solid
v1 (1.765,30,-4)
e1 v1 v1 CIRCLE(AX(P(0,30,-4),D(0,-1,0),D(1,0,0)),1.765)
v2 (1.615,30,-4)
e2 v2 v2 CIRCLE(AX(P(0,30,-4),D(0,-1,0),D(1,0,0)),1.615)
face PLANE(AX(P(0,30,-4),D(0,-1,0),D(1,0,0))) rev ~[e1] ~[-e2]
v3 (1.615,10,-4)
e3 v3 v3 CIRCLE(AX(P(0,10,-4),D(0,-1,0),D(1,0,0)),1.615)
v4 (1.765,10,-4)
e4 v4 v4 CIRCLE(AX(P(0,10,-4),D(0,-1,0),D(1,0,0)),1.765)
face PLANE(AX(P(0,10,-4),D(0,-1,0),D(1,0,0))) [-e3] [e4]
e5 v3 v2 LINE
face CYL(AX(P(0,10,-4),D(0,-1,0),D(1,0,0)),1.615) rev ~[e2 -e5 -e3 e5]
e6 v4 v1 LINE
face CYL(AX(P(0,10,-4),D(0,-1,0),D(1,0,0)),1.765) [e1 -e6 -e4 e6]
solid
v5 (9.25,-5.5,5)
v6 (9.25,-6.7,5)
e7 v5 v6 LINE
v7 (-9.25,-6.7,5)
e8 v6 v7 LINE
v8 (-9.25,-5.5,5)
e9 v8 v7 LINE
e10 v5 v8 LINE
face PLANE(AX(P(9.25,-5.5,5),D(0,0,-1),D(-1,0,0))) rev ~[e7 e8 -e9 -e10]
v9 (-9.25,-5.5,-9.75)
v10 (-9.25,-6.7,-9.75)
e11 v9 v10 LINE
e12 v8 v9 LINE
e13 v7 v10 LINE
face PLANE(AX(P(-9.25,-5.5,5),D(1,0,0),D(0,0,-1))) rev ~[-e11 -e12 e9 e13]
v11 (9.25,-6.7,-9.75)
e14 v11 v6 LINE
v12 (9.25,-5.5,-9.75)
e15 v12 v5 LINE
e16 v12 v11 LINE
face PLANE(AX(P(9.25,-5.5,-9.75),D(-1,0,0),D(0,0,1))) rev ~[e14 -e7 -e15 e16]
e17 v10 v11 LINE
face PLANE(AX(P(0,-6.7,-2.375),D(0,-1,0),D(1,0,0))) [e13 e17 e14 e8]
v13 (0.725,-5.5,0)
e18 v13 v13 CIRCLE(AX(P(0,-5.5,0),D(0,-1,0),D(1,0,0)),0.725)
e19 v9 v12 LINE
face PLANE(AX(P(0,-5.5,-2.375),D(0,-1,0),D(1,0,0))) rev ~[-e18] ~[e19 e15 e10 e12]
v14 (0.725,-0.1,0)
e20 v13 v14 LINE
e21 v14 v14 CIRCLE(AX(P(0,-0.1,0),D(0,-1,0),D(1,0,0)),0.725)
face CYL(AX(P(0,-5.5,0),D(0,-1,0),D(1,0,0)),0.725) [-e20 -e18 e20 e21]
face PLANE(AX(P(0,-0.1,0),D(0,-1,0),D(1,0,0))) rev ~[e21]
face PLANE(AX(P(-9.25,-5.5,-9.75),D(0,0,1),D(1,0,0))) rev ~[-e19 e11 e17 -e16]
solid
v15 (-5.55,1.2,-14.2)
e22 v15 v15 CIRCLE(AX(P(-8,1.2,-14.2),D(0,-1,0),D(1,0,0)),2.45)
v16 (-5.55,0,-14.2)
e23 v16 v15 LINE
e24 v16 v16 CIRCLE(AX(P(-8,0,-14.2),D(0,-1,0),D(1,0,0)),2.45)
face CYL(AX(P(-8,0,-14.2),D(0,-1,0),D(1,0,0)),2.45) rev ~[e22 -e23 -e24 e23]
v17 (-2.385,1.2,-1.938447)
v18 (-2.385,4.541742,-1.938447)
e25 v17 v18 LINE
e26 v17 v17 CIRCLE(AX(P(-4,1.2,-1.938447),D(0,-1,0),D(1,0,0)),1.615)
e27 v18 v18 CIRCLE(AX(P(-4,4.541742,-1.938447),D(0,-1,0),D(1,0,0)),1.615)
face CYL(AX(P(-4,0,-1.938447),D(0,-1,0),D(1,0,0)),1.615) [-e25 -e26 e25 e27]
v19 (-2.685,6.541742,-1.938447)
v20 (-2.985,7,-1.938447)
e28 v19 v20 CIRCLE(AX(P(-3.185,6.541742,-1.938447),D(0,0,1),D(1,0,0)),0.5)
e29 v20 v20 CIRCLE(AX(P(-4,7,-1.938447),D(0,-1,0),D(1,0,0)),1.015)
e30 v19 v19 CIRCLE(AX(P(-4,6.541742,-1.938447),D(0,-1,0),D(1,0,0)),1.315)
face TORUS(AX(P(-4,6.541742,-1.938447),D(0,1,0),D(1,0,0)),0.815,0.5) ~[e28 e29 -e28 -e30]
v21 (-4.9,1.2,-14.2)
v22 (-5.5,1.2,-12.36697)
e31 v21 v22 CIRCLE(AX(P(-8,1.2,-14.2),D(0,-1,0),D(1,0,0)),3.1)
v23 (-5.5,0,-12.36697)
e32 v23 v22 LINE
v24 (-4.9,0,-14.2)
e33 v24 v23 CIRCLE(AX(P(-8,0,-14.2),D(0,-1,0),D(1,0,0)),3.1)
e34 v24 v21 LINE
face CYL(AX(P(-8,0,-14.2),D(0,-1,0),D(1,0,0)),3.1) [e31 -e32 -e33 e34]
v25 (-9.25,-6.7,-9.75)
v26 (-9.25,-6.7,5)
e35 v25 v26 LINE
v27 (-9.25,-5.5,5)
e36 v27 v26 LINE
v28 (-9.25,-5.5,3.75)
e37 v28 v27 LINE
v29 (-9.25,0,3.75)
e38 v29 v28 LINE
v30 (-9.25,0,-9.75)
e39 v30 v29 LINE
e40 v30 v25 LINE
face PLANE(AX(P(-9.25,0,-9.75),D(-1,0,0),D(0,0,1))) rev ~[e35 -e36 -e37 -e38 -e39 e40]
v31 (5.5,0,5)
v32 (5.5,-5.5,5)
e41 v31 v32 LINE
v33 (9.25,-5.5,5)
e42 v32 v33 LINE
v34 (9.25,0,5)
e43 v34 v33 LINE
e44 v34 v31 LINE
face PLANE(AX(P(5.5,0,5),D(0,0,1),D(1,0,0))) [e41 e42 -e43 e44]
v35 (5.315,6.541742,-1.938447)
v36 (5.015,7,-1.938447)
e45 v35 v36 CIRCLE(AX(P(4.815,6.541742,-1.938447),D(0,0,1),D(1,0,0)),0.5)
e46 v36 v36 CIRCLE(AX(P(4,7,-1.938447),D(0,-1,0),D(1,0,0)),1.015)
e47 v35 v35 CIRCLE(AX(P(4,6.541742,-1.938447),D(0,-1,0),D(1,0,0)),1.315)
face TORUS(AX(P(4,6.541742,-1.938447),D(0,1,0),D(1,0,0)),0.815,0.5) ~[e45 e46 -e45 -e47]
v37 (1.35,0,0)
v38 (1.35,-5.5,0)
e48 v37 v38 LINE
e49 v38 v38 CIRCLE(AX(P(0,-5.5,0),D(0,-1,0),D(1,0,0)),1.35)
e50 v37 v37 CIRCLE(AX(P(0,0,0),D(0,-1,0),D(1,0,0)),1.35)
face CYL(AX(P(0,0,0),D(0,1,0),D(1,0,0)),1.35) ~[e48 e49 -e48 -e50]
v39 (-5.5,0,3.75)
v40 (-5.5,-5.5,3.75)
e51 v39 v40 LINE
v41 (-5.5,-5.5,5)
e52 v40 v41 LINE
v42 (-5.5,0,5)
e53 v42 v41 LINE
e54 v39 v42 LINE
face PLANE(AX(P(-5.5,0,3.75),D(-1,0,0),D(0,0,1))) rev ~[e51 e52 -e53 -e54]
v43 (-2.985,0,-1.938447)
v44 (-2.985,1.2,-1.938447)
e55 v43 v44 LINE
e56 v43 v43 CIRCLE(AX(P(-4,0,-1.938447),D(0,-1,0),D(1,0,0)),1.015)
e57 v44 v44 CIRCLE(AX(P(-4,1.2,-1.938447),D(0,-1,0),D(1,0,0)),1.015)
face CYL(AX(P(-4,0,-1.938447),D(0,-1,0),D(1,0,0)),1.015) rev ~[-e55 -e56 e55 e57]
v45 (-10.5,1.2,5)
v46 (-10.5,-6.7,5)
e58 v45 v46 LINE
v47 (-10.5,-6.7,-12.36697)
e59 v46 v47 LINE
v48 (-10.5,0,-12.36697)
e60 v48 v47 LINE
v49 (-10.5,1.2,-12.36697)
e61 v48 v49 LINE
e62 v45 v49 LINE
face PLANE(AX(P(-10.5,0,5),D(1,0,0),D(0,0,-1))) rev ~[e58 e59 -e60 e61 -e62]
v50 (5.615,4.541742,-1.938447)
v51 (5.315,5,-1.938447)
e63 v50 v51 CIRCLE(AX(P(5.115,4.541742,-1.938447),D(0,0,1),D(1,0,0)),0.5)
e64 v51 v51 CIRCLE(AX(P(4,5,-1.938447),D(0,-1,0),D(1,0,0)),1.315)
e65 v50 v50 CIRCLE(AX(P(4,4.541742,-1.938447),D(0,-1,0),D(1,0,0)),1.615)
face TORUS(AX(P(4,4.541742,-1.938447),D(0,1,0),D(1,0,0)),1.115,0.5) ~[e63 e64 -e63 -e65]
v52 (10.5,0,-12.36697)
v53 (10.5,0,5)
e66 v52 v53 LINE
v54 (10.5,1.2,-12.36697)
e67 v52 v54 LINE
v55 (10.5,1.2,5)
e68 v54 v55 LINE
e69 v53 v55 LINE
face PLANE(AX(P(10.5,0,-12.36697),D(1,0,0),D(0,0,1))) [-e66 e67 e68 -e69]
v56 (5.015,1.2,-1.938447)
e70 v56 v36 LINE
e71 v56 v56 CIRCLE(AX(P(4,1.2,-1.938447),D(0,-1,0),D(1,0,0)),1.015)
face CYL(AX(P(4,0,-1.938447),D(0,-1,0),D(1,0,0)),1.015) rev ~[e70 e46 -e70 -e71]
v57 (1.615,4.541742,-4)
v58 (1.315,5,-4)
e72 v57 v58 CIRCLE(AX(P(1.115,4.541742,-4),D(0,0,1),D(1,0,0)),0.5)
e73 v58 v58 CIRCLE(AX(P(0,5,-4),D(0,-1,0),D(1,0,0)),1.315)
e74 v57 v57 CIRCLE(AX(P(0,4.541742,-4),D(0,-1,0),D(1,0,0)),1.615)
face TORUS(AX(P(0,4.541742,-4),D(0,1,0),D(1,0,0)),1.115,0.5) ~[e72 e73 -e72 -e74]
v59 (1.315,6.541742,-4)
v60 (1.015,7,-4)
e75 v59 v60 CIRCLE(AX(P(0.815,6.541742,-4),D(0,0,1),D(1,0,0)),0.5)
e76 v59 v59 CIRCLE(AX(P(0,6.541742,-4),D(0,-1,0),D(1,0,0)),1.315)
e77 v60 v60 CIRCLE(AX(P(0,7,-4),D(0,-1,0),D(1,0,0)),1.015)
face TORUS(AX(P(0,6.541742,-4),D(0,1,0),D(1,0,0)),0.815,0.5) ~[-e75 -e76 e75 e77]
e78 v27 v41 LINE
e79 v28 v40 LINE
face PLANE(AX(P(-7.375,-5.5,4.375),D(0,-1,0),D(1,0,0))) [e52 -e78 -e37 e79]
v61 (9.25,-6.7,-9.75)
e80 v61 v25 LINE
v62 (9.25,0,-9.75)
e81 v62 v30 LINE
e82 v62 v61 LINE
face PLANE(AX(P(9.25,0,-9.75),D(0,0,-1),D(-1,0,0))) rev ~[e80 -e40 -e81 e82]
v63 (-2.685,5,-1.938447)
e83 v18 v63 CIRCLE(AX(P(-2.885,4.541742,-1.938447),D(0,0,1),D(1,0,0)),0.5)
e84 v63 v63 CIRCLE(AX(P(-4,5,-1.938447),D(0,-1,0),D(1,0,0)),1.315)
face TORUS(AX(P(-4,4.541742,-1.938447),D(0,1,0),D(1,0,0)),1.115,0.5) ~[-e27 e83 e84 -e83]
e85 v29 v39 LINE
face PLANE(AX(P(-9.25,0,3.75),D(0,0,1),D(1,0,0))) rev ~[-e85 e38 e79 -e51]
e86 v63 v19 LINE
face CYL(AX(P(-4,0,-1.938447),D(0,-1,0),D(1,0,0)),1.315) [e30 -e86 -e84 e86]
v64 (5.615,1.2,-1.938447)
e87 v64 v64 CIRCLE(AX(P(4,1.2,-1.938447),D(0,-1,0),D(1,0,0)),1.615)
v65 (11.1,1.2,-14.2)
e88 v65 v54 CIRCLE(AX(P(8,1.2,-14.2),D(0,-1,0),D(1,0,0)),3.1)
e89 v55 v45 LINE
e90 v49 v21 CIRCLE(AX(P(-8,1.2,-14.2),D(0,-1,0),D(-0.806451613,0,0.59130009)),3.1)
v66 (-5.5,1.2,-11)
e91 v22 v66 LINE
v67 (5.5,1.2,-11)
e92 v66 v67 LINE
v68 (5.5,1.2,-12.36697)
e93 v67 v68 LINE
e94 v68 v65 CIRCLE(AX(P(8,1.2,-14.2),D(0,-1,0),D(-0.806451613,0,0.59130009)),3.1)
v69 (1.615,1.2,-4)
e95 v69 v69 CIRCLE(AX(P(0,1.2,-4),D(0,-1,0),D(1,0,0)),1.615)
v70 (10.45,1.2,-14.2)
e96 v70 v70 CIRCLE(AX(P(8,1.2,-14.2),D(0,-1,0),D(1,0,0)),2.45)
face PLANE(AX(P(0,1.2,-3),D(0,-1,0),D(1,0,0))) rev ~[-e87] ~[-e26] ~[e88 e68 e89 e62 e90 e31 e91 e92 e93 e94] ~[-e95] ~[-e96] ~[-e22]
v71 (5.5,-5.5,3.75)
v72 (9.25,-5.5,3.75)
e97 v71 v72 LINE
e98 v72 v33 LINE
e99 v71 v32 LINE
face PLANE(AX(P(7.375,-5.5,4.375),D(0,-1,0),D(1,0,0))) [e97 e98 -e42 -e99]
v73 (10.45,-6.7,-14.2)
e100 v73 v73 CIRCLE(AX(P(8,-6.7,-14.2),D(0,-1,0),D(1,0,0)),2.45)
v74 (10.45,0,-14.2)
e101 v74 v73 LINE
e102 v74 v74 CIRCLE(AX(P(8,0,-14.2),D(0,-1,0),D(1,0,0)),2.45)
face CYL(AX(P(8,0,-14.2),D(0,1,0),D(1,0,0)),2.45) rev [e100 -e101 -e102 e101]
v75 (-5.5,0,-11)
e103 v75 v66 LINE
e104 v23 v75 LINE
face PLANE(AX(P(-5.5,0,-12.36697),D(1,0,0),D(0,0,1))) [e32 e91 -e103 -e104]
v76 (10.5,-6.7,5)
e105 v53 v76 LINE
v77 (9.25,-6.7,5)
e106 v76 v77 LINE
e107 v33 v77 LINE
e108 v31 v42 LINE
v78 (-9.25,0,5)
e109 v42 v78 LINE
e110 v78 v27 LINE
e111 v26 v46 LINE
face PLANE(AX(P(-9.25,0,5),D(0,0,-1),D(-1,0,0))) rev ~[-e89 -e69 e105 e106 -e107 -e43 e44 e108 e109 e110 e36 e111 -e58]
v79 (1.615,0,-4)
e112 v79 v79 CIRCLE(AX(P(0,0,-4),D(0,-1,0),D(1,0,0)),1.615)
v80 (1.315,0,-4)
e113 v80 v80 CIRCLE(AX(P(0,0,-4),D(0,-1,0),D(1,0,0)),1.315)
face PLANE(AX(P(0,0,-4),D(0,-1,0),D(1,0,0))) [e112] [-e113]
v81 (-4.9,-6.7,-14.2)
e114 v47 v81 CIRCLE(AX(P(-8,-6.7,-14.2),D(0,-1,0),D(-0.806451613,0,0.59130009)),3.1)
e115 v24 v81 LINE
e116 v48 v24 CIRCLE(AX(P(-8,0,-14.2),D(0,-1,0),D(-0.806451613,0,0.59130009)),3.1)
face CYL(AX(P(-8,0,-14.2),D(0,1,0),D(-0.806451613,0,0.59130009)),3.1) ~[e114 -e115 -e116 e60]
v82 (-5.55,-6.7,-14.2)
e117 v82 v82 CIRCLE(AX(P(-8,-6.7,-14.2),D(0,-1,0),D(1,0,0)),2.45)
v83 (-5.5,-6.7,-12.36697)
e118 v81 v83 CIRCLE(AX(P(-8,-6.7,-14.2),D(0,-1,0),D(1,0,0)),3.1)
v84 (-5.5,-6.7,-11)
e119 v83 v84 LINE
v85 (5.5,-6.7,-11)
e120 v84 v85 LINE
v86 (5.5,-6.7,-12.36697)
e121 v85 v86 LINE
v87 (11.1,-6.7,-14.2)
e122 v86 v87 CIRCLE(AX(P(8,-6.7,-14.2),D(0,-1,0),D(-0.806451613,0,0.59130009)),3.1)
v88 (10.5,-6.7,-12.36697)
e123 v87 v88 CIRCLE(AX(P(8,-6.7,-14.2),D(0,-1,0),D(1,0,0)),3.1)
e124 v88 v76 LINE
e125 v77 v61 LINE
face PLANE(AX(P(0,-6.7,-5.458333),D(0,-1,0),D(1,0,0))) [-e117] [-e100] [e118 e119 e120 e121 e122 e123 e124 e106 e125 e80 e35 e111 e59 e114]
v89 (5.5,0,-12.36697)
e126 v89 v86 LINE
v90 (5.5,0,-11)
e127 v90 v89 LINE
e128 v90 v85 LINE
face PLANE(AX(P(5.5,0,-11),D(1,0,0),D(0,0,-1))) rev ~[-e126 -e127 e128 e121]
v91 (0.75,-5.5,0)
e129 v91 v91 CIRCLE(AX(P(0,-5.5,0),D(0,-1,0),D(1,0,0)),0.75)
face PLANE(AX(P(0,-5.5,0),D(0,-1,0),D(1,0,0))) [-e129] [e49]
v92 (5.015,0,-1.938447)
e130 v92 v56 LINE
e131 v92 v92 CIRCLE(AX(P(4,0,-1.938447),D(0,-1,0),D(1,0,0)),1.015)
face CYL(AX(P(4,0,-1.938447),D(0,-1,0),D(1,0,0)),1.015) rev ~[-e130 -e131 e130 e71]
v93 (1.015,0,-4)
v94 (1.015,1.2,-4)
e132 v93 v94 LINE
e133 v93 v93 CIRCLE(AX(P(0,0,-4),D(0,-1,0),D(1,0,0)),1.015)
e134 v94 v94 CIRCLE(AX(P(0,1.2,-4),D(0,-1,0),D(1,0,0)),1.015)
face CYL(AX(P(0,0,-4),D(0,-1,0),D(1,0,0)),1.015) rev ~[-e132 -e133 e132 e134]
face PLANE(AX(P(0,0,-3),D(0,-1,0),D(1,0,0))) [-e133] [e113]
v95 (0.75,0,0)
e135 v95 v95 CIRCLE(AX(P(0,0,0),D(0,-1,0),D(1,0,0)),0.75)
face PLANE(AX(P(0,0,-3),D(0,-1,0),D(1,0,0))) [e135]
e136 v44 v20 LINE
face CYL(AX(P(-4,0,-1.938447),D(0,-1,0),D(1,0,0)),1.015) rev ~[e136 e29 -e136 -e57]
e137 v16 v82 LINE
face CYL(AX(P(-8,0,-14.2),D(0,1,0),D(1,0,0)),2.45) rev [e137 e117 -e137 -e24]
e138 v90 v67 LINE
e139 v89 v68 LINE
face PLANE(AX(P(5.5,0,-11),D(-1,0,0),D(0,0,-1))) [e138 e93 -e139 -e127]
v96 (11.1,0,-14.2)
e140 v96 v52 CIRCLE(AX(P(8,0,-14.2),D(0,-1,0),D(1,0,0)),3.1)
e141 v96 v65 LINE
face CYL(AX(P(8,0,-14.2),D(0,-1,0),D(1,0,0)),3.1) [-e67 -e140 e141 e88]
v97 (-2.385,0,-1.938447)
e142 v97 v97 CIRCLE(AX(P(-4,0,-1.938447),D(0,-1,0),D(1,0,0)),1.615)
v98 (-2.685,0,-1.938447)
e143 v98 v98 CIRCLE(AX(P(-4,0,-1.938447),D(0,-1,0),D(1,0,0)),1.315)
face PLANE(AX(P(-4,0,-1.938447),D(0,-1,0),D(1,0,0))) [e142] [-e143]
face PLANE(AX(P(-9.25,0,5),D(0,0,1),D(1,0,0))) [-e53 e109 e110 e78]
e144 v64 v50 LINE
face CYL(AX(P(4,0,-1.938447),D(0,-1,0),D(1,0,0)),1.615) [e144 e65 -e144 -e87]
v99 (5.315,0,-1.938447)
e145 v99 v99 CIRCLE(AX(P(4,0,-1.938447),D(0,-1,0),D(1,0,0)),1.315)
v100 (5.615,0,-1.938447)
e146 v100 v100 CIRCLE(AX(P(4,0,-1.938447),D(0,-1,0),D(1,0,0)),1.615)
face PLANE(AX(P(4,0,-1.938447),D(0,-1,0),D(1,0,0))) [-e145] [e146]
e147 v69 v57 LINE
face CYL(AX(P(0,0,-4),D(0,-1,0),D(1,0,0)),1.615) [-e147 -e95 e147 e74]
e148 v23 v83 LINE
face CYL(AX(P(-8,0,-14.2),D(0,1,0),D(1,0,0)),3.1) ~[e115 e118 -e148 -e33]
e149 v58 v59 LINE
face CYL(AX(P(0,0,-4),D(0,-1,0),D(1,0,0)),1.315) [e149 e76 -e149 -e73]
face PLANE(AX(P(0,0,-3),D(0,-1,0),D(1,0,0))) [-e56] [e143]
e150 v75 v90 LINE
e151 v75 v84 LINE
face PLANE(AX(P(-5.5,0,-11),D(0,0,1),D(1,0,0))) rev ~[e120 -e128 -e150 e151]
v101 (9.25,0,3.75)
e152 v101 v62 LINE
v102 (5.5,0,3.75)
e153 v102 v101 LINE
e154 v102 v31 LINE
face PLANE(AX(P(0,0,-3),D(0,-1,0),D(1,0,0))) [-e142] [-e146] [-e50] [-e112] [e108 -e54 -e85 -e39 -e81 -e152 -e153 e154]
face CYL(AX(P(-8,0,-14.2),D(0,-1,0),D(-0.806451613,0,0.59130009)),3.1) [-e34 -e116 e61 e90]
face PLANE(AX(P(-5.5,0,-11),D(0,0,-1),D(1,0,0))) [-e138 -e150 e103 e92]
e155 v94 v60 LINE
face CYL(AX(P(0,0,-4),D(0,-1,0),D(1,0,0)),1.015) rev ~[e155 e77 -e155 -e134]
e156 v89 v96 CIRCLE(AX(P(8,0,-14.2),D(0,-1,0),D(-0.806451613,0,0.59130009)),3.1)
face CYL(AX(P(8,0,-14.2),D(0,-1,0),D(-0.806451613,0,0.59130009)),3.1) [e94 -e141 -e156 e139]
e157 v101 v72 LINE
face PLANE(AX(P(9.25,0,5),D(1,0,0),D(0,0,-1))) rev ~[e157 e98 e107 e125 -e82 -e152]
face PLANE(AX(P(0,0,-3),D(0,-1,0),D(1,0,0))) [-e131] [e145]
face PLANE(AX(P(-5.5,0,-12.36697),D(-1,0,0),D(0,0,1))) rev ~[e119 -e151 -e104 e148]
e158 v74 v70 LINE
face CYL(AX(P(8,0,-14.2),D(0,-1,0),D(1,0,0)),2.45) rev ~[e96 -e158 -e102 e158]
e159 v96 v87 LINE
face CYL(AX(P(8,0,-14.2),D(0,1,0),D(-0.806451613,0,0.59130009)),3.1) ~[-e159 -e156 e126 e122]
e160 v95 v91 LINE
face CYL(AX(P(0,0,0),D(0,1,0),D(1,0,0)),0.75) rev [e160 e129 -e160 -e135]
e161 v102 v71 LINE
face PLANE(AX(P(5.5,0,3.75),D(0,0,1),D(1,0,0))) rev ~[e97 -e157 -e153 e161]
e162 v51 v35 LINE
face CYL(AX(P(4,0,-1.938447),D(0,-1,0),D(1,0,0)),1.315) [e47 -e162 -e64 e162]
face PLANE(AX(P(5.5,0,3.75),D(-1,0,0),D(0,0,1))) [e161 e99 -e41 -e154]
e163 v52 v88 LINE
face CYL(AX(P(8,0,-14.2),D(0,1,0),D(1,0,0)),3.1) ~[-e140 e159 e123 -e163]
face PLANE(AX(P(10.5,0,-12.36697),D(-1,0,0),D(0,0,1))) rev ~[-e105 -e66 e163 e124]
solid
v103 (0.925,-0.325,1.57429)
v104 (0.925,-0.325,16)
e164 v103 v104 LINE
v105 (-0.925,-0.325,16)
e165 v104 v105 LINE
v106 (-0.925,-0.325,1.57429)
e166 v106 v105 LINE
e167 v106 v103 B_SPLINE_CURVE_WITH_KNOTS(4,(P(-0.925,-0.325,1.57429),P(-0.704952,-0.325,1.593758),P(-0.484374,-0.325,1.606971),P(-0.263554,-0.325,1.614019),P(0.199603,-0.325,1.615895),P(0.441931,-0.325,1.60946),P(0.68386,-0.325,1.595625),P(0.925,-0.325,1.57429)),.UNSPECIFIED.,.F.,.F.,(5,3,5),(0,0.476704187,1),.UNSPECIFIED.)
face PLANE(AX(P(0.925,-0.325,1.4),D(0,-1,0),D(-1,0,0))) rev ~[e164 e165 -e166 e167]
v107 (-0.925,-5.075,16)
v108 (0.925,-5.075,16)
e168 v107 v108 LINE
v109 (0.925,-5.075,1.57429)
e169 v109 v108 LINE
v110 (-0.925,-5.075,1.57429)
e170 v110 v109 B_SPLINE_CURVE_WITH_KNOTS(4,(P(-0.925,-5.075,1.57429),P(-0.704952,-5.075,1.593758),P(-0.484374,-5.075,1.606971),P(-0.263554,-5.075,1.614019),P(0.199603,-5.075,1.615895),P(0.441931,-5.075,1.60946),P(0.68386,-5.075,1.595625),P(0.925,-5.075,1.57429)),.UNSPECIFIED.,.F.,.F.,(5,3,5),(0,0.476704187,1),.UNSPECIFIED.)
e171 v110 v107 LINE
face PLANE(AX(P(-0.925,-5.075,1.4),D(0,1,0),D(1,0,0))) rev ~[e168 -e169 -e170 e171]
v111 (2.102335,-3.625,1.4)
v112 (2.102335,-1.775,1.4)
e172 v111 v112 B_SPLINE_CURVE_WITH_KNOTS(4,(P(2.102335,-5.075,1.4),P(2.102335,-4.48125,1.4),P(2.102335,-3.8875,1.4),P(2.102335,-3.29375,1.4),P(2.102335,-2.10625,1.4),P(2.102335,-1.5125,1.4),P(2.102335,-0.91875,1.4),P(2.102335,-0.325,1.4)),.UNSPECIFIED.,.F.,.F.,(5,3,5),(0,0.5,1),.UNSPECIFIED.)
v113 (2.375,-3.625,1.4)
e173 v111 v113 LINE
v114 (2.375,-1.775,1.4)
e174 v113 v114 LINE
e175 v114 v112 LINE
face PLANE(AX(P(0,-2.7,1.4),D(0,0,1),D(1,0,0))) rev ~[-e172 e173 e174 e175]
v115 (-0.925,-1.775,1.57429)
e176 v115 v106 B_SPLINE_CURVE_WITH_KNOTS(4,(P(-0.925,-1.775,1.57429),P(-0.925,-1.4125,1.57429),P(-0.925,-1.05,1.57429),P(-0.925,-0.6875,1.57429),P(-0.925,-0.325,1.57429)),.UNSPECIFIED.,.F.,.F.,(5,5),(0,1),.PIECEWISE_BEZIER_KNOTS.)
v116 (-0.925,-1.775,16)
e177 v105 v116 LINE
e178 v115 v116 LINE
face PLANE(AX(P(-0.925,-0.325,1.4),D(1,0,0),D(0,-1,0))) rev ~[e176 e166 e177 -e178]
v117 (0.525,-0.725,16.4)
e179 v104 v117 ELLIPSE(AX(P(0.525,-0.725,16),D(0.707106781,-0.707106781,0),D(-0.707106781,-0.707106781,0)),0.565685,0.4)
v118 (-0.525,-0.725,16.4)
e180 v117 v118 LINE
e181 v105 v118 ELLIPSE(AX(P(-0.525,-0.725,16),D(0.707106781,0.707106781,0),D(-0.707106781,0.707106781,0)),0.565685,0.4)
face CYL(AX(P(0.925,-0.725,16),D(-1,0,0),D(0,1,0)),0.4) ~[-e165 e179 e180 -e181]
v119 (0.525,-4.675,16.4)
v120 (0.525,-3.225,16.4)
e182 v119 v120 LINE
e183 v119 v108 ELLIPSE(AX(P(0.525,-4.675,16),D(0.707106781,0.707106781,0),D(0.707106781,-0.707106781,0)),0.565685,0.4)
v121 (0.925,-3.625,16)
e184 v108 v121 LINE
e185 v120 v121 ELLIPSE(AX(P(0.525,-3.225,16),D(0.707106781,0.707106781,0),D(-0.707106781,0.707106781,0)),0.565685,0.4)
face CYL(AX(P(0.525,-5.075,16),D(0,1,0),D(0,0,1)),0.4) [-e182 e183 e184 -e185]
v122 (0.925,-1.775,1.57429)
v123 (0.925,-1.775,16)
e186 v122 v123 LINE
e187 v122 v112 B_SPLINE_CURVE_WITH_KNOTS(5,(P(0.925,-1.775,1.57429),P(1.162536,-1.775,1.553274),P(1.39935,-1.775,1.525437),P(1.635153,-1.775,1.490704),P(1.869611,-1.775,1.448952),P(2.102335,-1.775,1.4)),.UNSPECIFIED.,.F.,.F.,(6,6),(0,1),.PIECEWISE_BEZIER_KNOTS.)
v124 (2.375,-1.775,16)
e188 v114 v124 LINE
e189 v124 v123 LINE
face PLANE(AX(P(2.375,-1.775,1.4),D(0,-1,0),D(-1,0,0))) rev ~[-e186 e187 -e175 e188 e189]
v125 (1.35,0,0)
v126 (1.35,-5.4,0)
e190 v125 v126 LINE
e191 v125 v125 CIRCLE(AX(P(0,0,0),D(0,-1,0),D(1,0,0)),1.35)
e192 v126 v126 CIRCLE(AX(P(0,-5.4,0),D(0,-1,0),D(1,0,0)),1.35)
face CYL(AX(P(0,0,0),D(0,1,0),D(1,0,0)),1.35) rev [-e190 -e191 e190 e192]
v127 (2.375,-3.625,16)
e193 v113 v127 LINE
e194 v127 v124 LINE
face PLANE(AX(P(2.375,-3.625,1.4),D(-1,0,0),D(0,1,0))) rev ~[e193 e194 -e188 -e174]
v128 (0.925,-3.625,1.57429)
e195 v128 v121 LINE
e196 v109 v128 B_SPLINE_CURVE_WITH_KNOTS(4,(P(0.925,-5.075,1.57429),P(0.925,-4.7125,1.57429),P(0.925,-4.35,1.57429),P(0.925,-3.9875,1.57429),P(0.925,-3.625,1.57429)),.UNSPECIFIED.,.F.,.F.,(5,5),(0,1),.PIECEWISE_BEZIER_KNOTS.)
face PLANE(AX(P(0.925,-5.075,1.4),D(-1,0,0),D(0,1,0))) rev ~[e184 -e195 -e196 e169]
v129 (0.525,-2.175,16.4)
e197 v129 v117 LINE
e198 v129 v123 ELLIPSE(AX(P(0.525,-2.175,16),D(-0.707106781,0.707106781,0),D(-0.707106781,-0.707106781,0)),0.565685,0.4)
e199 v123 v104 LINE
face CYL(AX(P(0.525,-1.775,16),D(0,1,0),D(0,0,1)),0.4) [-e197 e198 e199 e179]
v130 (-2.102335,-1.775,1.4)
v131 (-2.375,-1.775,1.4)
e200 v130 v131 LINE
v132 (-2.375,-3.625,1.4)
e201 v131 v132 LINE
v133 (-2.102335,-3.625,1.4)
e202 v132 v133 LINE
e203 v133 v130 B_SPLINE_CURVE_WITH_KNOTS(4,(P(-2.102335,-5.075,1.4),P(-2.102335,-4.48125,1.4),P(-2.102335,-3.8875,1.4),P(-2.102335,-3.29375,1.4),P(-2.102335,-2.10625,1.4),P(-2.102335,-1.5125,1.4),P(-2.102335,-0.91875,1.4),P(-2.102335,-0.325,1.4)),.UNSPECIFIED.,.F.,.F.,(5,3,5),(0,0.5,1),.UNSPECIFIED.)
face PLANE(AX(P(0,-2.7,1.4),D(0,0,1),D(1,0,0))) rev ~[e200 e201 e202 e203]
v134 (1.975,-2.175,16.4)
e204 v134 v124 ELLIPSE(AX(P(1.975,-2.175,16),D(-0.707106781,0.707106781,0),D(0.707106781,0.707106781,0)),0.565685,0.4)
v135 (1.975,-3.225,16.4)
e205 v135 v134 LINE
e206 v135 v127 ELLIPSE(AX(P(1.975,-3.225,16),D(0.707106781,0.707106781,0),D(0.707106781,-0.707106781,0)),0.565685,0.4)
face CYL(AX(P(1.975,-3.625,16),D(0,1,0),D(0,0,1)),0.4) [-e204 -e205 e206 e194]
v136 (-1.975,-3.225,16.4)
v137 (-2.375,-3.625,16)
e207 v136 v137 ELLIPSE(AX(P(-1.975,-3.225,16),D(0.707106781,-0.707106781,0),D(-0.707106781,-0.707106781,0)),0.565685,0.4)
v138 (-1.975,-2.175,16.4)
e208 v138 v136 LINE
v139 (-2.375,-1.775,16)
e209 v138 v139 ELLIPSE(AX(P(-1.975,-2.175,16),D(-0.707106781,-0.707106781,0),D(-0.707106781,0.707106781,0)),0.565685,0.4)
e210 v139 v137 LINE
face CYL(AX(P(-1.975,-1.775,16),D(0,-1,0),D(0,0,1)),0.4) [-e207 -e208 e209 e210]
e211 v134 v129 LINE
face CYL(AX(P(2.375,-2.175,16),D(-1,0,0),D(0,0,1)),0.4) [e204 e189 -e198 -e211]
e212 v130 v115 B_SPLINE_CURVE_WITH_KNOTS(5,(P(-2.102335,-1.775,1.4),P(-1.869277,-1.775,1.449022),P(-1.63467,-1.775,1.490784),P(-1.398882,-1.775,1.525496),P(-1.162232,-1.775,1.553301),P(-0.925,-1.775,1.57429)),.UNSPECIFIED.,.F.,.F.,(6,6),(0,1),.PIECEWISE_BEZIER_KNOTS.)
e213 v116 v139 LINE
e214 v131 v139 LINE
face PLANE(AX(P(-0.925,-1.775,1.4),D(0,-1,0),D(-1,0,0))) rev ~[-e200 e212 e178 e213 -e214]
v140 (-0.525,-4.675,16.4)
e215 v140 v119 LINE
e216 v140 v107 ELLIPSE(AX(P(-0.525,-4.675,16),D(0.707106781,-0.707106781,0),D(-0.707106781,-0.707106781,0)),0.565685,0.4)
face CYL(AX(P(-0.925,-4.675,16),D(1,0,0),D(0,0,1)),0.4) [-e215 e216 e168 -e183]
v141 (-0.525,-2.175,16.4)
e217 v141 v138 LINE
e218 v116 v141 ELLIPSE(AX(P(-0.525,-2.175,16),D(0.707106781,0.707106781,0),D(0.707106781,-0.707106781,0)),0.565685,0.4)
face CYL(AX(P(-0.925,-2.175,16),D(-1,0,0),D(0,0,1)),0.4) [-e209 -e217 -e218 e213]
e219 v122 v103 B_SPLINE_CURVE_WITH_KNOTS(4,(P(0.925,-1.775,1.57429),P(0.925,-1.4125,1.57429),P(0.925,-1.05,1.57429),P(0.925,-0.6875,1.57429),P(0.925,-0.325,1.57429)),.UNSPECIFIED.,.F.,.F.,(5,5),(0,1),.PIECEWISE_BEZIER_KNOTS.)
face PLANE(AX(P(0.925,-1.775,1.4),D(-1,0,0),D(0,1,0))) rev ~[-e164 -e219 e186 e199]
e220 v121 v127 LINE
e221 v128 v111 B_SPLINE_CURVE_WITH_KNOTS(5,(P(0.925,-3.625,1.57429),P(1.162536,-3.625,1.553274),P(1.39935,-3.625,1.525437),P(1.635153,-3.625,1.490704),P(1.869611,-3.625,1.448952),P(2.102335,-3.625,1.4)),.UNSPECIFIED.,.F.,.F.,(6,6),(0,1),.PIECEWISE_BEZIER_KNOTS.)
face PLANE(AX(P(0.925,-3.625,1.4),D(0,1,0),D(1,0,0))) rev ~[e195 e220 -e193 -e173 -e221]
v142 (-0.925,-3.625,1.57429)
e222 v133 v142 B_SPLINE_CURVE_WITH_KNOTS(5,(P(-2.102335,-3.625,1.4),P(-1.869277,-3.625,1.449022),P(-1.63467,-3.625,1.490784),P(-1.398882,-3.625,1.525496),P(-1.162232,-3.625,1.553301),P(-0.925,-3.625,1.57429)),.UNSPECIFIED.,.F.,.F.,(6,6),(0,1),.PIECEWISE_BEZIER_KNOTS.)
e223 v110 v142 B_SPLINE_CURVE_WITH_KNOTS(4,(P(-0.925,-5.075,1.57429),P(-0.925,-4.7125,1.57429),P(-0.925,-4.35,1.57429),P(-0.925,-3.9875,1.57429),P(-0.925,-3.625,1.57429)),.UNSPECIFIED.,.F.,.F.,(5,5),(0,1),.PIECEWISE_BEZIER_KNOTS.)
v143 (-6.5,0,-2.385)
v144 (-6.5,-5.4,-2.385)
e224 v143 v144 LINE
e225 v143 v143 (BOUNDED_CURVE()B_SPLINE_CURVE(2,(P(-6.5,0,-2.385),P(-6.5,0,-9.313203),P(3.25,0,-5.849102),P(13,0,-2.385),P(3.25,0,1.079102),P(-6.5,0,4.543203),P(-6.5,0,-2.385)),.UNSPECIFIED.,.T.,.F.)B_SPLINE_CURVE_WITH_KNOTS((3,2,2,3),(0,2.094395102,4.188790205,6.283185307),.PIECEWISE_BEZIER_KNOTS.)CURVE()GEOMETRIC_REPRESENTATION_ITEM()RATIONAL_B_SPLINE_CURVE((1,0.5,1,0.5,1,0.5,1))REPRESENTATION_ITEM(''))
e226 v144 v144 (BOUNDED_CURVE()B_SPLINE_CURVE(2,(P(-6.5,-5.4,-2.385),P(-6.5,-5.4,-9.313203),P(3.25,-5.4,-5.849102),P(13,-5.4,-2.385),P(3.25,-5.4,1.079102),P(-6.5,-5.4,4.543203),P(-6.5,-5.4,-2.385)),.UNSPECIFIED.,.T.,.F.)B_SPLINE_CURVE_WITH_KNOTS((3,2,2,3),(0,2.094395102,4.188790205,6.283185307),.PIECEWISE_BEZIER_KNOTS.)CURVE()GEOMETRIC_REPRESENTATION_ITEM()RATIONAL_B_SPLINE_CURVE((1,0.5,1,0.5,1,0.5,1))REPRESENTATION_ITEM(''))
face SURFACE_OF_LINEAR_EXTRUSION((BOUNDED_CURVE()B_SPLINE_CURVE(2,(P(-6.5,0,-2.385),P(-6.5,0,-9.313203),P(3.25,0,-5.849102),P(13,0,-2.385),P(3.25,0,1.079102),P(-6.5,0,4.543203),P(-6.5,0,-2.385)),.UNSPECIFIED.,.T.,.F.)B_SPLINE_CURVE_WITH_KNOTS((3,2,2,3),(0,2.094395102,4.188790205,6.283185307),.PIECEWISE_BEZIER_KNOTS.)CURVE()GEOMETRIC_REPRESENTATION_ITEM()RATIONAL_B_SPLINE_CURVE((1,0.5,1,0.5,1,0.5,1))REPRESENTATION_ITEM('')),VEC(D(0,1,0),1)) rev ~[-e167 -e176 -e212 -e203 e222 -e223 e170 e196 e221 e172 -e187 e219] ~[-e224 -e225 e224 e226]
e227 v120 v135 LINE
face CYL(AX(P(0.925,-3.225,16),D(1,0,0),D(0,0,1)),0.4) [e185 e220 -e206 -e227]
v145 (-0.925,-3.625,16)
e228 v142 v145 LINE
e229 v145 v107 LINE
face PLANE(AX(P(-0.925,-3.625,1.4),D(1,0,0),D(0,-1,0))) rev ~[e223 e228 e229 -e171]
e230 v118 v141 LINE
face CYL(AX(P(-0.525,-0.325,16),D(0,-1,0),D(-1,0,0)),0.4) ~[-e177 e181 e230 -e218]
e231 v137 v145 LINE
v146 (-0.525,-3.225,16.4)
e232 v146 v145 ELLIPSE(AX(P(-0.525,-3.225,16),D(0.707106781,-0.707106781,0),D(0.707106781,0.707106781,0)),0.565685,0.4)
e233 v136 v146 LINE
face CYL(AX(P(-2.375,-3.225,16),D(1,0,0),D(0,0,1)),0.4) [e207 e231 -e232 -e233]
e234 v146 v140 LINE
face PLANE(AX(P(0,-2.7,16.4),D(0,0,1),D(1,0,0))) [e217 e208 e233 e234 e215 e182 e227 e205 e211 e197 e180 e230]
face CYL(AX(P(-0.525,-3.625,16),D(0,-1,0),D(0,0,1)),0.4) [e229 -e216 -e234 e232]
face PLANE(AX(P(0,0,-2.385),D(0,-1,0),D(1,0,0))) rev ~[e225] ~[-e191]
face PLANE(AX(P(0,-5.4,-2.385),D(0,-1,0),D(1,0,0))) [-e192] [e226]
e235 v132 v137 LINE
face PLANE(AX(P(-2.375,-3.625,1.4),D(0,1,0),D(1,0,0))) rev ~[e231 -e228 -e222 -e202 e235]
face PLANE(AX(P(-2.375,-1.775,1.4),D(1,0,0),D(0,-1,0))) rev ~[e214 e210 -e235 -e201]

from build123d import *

# Parameters (mm, degrees)
F0_R      = 1.615
F0_R_2    = 1.35
F0_R_3    = 2.45
F0_R_4    = 1.315
F0_R_5    = 0.75
F0_R_6    = 1.015
F0_W      = 3.75
F0_H      = 1.25
F1_DEPTH  = 1.2
F2_DEPTH  = 6.7
F3_DEPTH  = 5.5
F4_DEPTH  = 5
F5_DEPTH  = 7
F8_R      = 0.725
F9_DEPTH  = 1.2
F10_DEPTH = 5.4
F11_DEPTH = 5.4
F14_DEPTH = 15
F15_R     = 0.4
F17_R     = 1.765
F17_R_2   = 1.615
F18_DEPTH = 20


# Not quite as in the source:
# - a fillet or chamfer that OpenCascade refuses, or shapes differently, is made with other operations: its cross-section is extruded or revolved along the edge and cut away or added


with BuildPart() as f1:
    # F0 (on Front) → F1 (new body)
    with BuildSketch(Plane.XZ):
        Polygon((0, 3.75), (-5.5, 3.75), (-9.25, 3.75), (-9.25, -9.75), (9.25, -9.75), (9.25, 3.75), (5.5, 3.75), align=None)
        with BuildLine():
            add(Edge.make_bspline(
                [(-6.5, -2.385), (-6.5, -9.3132032303), (3.25, -5.8491016151), (13, -2.385), (3.25, 1.0791016151), (-6.5, 4.5432032303), (-6.5, -2.385)],
                knots=[0, 0, 0, 2.0943951024, 2.0943951024, 4.1887902048, 4.1887902048, 6.2831853072, 6.2831853072, 6.2831853072], degree=2, weights=[1, 0.5, 1, 0.5, 1, 0.5, 1]))
        make_face(mode=Mode.SUBTRACT)
        with BuildLine():
            add(Edge.make_bspline(
                [(-6.5, -2.385), (-6.5, -9.3132032303), (3.25, -5.8491016151), (13, -2.385), (3.25, 1.0791016151), (-6.5, 4.5432032303), (-6.5, -2.385)],
                knots=[0, 0, 0, 2.0943951024, 2.0943951024, 4.1887902048, 4.1887902048, 6.2831853072, 6.2831853072, 6.2831853072], degree=2, weights=[1, 0.5, 1, 0.5, 1, 0.5, 1]))
        make_face()
        with Locations((-4, -1.9384471872)):
            Circle(F0_R, mode=Mode.SUBTRACT)
        with Locations((0, -4)):
            Circle(F0_R, mode=Mode.SUBTRACT)
        with Locations((4, -1.9384471872)):
            Circle(F0_R, mode=Mode.SUBTRACT)
        Circle(F0_R_2, mode=Mode.SUBTRACT)
        Polygon((-9.25, 3.75), (-9.25, 5), (-10.5, 5), (-10.5, -11), (-5.5, -11), (5.5, -11), (10.5, -11), (10.5, 5), (9.25, 5), (9.25, 3.75), (9.25, -9.75), (-9.25, -9.75), align=None)
        with BuildLine():
            ThreePointArc((-5.5, -12.366969722), (-8, -11.1), (-10.5, -12.366969722))
            ThreePointArc((-10.5, -12.366969722), (-8.9643650761, -17.1461839725), (-4.9, -14.2))
            ThreePointArc((-4.9, -14.2), (-5.0538160275, -13.2356349239), (-5.5, -12.366969722))
        make_face()
        with Locations((-8, -14.2)):
            Circle(F0_R_3, mode=Mode.SUBTRACT)
        with BuildLine():
            ThreePointArc((11.1, -14.2), (10.9461839725, -13.2356349239), (10.5, -12.366969722))
            ThreePointArc((10.5, -12.366969722), (8, -11.1), (5.5, -12.366969722))
            ThreePointArc((5.5, -12.366969722), (7.0356349239, -17.1461839725), (11.1, -14.2))
        make_face()
        with Locations((8, -14.2)):
            Circle(F0_R_3, mode=Mode.SUBTRACT)
        Polygon((5.5, 5), (0, 5), (-5.5, 5), (-5.5, 3.75), (0, 3.75), (5.5, 3.75), align=None)
        with Locations((-4, -1.9384471872)):
            Circle(F0_R)
        with Locations((-4, -1.9384471872)):
            Circle(F0_R_4, mode=Mode.SUBTRACT)
        with Locations((0, -4)):
            Circle(F0_R)
        with Locations((0, -4)):
            Circle(F0_R_4, mode=Mode.SUBTRACT)
        with Locations((4, -1.9384471872)):
            Circle(F0_R)
        with Locations((4, -1.9384471872)):
            Circle(F0_R_4, mode=Mode.SUBTRACT)
        Circle(F0_R_2)
        Circle(F0_R_5, mode=Mode.SUBTRACT)
        with Locations((4, -1.9384471872)):
            Circle(F0_R_4)
        with Locations((4, -1.9384471872)):
            Circle(F0_R_6, mode=Mode.SUBTRACT)
        with Locations((0, -4)):
            Circle(F0_R_4)
        with Locations((0, -4)):
            Circle(F0_R_6, mode=Mode.SUBTRACT)
        with Locations((-4, -1.9384471872)):
            Circle(F0_R_4)
        with Locations((-4, -1.9384471872)):
            Circle(F0_R_6, mode=Mode.SUBTRACT)
        with Locations((-7.375, 4.375)):
            Rectangle(F0_W, F0_H)
        with Locations((7.375, 4.375)):
            Rectangle(F0_W, F0_H)
        with BuildLine():
            Line((-5.5, -11), (-10.5, -11))
            Line((-10.5, -11), (-10.5, -12.366969722))
            ThreePointArc((-10.5, -12.366969722), (-8, -11.1), (-5.5, -12.366969722))
            Line((-5.5, -12.366969722), (-5.5, -11))
        make_face()
        with BuildLine():
            Line((10.5, -12.366969722), (10.5, -11))
            Line((10.5, -11), (5.5, -11))
            Line((5.5, -11), (5.5, -12.366969722))
            ThreePointArc((5.5, -12.366969722), (8, -11.1), (10.5, -12.366969722))
        make_face()
        Circle(F0_R_5)
    extrude(amount=-F1_DEPTH)

    # F0 (on Front) → F2 (join)
    with BuildSketch(Plane.XZ):
        Polygon((-9.25, 3.75), (-9.25, 5), (-10.5, 5), (-10.5, -11), (-5.5, -11), (5.5, -11), (10.5, -11), (10.5, 5), (9.25, 5), (9.25, 3.75), (9.25, -9.75), (-9.25, -9.75), align=None)
        with BuildLine():
            ThreePointArc((-5.5, -12.366969722), (-8, -11.1), (-10.5, -12.366969722))
            ThreePointArc((-10.5, -12.366969722), (-8.9643650761, -17.1461839725), (-4.9, -14.2))
            ThreePointArc((-4.9, -14.2), (-5.0538160275, -13.2356349239), (-5.5, -12.366969722))
        make_face()
        with Locations((-8, -14.2)):
            Circle(F0_R_3, mode=Mode.SUBTRACT)
        with BuildLine():
            Line((-5.5, -11), (-10.5, -11))
            Line((-10.5, -11), (-10.5, -12.366969722))
            ThreePointArc((-10.5, -12.366969722), (-8, -11.1), (-5.5, -12.366969722))
            Line((-5.5, -12.366969722), (-5.5, -11))
        make_face()
        with BuildLine():
            ThreePointArc((11.1, -14.2), (10.9461839725, -13.2356349239), (10.5, -12.366969722))
            ThreePointArc((10.5, -12.366969722), (8, -11.1), (5.5, -12.366969722))
            ThreePointArc((5.5, -12.366969722), (7.0356349239, -17.1461839725), (11.1, -14.2))
        make_face()
        with Locations((8, -14.2)):
            Circle(F0_R_3, mode=Mode.SUBTRACT)
        with BuildLine():
            Line((10.5, -12.366969722), (10.5, -11))
            Line((10.5, -11), (5.5, -11))
            Line((5.5, -11), (5.5, -12.366969722))
            ThreePointArc((5.5, -12.366969722), (8, -11.1), (10.5, -12.366969722))
        make_face()
    extrude(amount=F2_DEPTH)

    # F0 (on Front) → F3 (join)
    with BuildSketch(Plane.XZ):
        with Locations((-7.375, 4.375)):
            Rectangle(F0_W, F0_H)
        with Locations((7.375, 4.375)):
            Rectangle(F0_W, F0_H)
        Circle(F0_R_2)
        Circle(F0_R_5, mode=Mode.SUBTRACT)
    extrude(amount=F3_DEPTH)

    # F0 (on Front) → F4 (join)
    with BuildSketch(Plane.XZ):
        with Locations((-4, -1.9384471872)):
            Circle(F0_R)
        with Locations((-4, -1.9384471872)):
            Circle(F0_R_4, mode=Mode.SUBTRACT)
        with Locations((0, -4)):
            Circle(F0_R)
        with Locations((0, -4)):
            Circle(F0_R_4, mode=Mode.SUBTRACT)
        with Locations((4, -1.9384471872)):
            Circle(F0_R)
        with Locations((4, -1.9384471872)):
            Circle(F0_R_4, mode=Mode.SUBTRACT)
    extrude(amount=-F4_DEPTH)

    # F0 (on Front) → F5 (join)
    with BuildSketch(Plane.XZ):
        with Locations((-4, -1.9384471872)):
            Circle(F0_R_4)
        with Locations((-4, -1.9384471872)):
            Circle(F0_R_6, mode=Mode.SUBTRACT)
        with Locations((0, -4)):
            Circle(F0_R_4)
        with Locations((0, -4)):
            Circle(F0_R_6, mode=Mode.SUBTRACT)
        with Locations((4, -1.9384471872)):
            Circle(F0_R_4)
        with Locations((4, -1.9384471872)):
            Circle(F0_R_6, mode=Mode.SUBTRACT)
    extrude(amount=-F5_DEPTH)

    # F6: fillet of radius 0.5 on 3 edges, made by hand

    # F6_s1 → F6_t2 (revolve, cut)
    with BuildSketch(Plane.XY.offset(-1.9384471872)):
        with BuildLine():
            ThreePointArc((5.615, 4.5417424305), (5.5333300133, 4.8156037093), (5.315, 5))
            Line((5.315, 5), (5.615, 5))
            Line((5.615, 5), (5.615, 4.5417424305))
        make_face()
    revolve(axis=Axis((4, 5, -1.9384471872), (0, -1, 0)), mode=Mode.SUBTRACT)

    # F6_s3 → F6_t4 (revolve, cut)
    with BuildSketch(Plane.XY.offset(-4)):
        with BuildLine():
            ThreePointArc((1.615, 4.5417424305), (1.5333300133, 4.8156037093), (1.315, 5))
            Line((1.315, 5), (1.615, 5))
            Line((1.615, 5), (1.615, 4.5417424305))
        make_face()
    revolve(axis=Axis((0, 5, -4), (0, -1, 0)), mode=Mode.SUBTRACT)

    # F6_s5 → F6_t6 (revolve, cut)
    with BuildSketch(Plane.XY.offset(-1.9384471872)):
        with BuildLine():
            ThreePointArc((-2.385, 4.5417424305), (-2.4666699867, 4.8156037093), (-2.685, 5))
            Line((-2.685, 5), (-2.385, 5))
            Line((-2.385, 5), (-2.385, 4.5417424305))
        make_face()
    revolve(axis=Axis((-4, 5, -1.9384471872), (0, -1, 0)), mode=Mode.SUBTRACT)

    # F7: fillet of radius 0.5 on 3 edges, made by hand

    # F7_s1 → F7_t2 (revolve, cut)
    with BuildSketch(Plane.XY.offset(-1.9384471872)):
        with BuildLine():
            ThreePointArc((5.315, 6.5417424305), (5.2333300133, 6.8156037093), (5.015, 7))
            Line((5.015, 7), (5.315, 7))
            Line((5.315, 7), (5.315, 6.5417424305))
        make_face()
    revolve(axis=Axis((4, 7, -1.9384471872), (0, -1, 0)), mode=Mode.SUBTRACT)

    # F7_s3 → F7_t4 (revolve, cut)
    with BuildSketch(Plane.XY.offset(-4)):
        with BuildLine():
            ThreePointArc((1.315, 6.5417424305), (1.2333300133, 6.8156037093), (1.015, 7))
            Line((1.015, 7), (1.315, 7))
            Line((1.315, 7), (1.315, 6.5417424305))
        make_face()
    revolve(axis=Axis((0, 7, -4), (0, -1, 0)), mode=Mode.SUBTRACT)

    # F7_s5 → F7_t6 (revolve, cut)
    with BuildSketch(Plane.XY.offset(-1.9384471872)):
        with BuildLine():
            ThreePointArc((-2.685, 6.5417424305), (-2.7666699867, 6.8156037093), (-2.985, 7))
            Line((-2.985, 7), (-2.685, 7))
            Line((-2.685, 7), (-2.685, 6.5417424305))
        make_face()
    revolve(axis=Axis((-4, 7, -1.9384471872), (0, -1, 0)), mode=Mode.SUBTRACT)


with BuildPart() as f9:
    # F8 (on face) → F9 (new body)
    with BuildSketch(Plane.XZ.offset(5.5)):
        Polygon((-5.5, 5), (-9.25, 5), (-9.25, -9.75), (9.25, -9.75), (9.25, 5), (5.5, 5), align=None)
        Circle(F8_R, mode=Mode.SUBTRACT)
        Circle(F8_R)
    extrude(amount=F9_DEPTH)

    # F8 (on face) → F10 (join)
    with BuildSketch(Plane.XZ.offset(5.5)):
        Circle(F8_R)
    extrude(amount=-F10_DEPTH)


with BuildPart() as f11:
    # F0 (on Front) → F11 (new body)
    with BuildSketch(Plane.XZ):
        with BuildLine():
            add(Edge.make_bspline(
                [(-6.5, -2.385), (-6.5, -9.3132032303), (3.25, -5.8491016151), (13, -2.385), (3.25, 1.0791016151), (-6.5, 4.5432032303), (-6.5, -2.385)],
                knots=[0, 0, 0, 2.0943951024, 2.0943951024, 4.1887902048, 4.1887902048, 6.2831853072, 6.2831853072, 6.2831853072], degree=2, weights=[1, 0.5, 1, 0.5, 1, 0.5, 1]))
        make_face()
        with Locations((-4, -1.9384471872)):
            Circle(F0_R, mode=Mode.SUBTRACT)
        with Locations((0, -4)):
            Circle(F0_R, mode=Mode.SUBTRACT)
        with Locations((4, -1.9384471872)):
            Circle(F0_R, mode=Mode.SUBTRACT)
        Circle(F0_R_2, mode=Mode.SUBTRACT)
        with Locations((-4, -1.9384471872)):
            Circle(F0_R)
        with Locations((-4, -1.9384471872)):
            Circle(F0_R_4, mode=Mode.SUBTRACT)
        with Locations((-4, -1.9384471872)):
            Circle(F0_R_4)
        with Locations((-4, -1.9384471872)):
            Circle(F0_R_6, mode=Mode.SUBTRACT)
        with Locations((-4, -1.9384471872)):
            Circle(F0_R_6)
        with Locations((0, -4)):
            Circle(F0_R)
        with Locations((0, -4)):
            Circle(F0_R_4, mode=Mode.SUBTRACT)
        with Locations((0, -4)):
            Circle(F0_R_4)
        with Locations((0, -4)):
            Circle(F0_R_6, mode=Mode.SUBTRACT)
        with Locations((0, -4)):
            Circle(F0_R_6)
        with Locations((4, -1.9384471872)):
            Circle(F0_R)
        with Locations((4, -1.9384471872)):
            Circle(F0_R_4, mode=Mode.SUBTRACT)
        with Locations((4, -1.9384471872)):
            Circle(F0_R_4)
        with Locations((4, -1.9384471872)):
            Circle(F0_R_6, mode=Mode.SUBTRACT)
        with Locations((4, -1.9384471872)):
            Circle(F0_R_6)
    extrude(amount=F11_DEPTH)

    # F13 (on offset) → F14 (join)
    with BuildSketch(Plane.XY.offset(1.4)):
        Polygon((0.925, -0.325), (0, -0.325), (-0.925, -0.325), (-0.925, -1.775), (-2.375, -1.775), (-2.375, -2.7), (-2.375, -3.625), (-0.925, -3.625), (-0.925, -5.075), (0, -5.075), (0.925, -5.075), (0.925, -3.625), (2.375, -3.625), (2.375, -2.7), (2.375, -1.775), (0.925, -1.775), align=None)
    extrude(amount=F14_DEPTH)

    # F15
    f15_edges = [f11.edges().sort_by_distance(p)[0] for p in [
        (0, -0.325, 16.4),
        (-0.925, -1.05, 16.4),
        (-1.65, -1.775, 16.4),
        (-2.375, -2.7, 16.4),
        (-1.65, -3.625, 16.4),
        (-0.925, -4.35, 16.4),
        (0, -5.075, 16.4),
        (0.925, -4.35, 16.4),
        (1.65, -3.625, 16.4),
        (2.375, -2.7, 16.4),
        (1.65, -1.775, 16.4),
        (0.925, -1.05, 16.4),
    ]]
    fillet(f15_edges, radius=F15_R)


with BuildPart() as f18:
    # F17 (on offset) → F18 (new body)
    with BuildSketch(Plane.XZ.offset(-10)):
        with Locations((0, -4)):
            Circle(F17_R)
        with Locations((0, -4)):
            Circle(F17_R_2, mode=Mode.SUBTRACT)
    extrude(amount=-F18_DEPTH)


solid = Compound([f1.part, f9.part, f11.part, f18.part])
